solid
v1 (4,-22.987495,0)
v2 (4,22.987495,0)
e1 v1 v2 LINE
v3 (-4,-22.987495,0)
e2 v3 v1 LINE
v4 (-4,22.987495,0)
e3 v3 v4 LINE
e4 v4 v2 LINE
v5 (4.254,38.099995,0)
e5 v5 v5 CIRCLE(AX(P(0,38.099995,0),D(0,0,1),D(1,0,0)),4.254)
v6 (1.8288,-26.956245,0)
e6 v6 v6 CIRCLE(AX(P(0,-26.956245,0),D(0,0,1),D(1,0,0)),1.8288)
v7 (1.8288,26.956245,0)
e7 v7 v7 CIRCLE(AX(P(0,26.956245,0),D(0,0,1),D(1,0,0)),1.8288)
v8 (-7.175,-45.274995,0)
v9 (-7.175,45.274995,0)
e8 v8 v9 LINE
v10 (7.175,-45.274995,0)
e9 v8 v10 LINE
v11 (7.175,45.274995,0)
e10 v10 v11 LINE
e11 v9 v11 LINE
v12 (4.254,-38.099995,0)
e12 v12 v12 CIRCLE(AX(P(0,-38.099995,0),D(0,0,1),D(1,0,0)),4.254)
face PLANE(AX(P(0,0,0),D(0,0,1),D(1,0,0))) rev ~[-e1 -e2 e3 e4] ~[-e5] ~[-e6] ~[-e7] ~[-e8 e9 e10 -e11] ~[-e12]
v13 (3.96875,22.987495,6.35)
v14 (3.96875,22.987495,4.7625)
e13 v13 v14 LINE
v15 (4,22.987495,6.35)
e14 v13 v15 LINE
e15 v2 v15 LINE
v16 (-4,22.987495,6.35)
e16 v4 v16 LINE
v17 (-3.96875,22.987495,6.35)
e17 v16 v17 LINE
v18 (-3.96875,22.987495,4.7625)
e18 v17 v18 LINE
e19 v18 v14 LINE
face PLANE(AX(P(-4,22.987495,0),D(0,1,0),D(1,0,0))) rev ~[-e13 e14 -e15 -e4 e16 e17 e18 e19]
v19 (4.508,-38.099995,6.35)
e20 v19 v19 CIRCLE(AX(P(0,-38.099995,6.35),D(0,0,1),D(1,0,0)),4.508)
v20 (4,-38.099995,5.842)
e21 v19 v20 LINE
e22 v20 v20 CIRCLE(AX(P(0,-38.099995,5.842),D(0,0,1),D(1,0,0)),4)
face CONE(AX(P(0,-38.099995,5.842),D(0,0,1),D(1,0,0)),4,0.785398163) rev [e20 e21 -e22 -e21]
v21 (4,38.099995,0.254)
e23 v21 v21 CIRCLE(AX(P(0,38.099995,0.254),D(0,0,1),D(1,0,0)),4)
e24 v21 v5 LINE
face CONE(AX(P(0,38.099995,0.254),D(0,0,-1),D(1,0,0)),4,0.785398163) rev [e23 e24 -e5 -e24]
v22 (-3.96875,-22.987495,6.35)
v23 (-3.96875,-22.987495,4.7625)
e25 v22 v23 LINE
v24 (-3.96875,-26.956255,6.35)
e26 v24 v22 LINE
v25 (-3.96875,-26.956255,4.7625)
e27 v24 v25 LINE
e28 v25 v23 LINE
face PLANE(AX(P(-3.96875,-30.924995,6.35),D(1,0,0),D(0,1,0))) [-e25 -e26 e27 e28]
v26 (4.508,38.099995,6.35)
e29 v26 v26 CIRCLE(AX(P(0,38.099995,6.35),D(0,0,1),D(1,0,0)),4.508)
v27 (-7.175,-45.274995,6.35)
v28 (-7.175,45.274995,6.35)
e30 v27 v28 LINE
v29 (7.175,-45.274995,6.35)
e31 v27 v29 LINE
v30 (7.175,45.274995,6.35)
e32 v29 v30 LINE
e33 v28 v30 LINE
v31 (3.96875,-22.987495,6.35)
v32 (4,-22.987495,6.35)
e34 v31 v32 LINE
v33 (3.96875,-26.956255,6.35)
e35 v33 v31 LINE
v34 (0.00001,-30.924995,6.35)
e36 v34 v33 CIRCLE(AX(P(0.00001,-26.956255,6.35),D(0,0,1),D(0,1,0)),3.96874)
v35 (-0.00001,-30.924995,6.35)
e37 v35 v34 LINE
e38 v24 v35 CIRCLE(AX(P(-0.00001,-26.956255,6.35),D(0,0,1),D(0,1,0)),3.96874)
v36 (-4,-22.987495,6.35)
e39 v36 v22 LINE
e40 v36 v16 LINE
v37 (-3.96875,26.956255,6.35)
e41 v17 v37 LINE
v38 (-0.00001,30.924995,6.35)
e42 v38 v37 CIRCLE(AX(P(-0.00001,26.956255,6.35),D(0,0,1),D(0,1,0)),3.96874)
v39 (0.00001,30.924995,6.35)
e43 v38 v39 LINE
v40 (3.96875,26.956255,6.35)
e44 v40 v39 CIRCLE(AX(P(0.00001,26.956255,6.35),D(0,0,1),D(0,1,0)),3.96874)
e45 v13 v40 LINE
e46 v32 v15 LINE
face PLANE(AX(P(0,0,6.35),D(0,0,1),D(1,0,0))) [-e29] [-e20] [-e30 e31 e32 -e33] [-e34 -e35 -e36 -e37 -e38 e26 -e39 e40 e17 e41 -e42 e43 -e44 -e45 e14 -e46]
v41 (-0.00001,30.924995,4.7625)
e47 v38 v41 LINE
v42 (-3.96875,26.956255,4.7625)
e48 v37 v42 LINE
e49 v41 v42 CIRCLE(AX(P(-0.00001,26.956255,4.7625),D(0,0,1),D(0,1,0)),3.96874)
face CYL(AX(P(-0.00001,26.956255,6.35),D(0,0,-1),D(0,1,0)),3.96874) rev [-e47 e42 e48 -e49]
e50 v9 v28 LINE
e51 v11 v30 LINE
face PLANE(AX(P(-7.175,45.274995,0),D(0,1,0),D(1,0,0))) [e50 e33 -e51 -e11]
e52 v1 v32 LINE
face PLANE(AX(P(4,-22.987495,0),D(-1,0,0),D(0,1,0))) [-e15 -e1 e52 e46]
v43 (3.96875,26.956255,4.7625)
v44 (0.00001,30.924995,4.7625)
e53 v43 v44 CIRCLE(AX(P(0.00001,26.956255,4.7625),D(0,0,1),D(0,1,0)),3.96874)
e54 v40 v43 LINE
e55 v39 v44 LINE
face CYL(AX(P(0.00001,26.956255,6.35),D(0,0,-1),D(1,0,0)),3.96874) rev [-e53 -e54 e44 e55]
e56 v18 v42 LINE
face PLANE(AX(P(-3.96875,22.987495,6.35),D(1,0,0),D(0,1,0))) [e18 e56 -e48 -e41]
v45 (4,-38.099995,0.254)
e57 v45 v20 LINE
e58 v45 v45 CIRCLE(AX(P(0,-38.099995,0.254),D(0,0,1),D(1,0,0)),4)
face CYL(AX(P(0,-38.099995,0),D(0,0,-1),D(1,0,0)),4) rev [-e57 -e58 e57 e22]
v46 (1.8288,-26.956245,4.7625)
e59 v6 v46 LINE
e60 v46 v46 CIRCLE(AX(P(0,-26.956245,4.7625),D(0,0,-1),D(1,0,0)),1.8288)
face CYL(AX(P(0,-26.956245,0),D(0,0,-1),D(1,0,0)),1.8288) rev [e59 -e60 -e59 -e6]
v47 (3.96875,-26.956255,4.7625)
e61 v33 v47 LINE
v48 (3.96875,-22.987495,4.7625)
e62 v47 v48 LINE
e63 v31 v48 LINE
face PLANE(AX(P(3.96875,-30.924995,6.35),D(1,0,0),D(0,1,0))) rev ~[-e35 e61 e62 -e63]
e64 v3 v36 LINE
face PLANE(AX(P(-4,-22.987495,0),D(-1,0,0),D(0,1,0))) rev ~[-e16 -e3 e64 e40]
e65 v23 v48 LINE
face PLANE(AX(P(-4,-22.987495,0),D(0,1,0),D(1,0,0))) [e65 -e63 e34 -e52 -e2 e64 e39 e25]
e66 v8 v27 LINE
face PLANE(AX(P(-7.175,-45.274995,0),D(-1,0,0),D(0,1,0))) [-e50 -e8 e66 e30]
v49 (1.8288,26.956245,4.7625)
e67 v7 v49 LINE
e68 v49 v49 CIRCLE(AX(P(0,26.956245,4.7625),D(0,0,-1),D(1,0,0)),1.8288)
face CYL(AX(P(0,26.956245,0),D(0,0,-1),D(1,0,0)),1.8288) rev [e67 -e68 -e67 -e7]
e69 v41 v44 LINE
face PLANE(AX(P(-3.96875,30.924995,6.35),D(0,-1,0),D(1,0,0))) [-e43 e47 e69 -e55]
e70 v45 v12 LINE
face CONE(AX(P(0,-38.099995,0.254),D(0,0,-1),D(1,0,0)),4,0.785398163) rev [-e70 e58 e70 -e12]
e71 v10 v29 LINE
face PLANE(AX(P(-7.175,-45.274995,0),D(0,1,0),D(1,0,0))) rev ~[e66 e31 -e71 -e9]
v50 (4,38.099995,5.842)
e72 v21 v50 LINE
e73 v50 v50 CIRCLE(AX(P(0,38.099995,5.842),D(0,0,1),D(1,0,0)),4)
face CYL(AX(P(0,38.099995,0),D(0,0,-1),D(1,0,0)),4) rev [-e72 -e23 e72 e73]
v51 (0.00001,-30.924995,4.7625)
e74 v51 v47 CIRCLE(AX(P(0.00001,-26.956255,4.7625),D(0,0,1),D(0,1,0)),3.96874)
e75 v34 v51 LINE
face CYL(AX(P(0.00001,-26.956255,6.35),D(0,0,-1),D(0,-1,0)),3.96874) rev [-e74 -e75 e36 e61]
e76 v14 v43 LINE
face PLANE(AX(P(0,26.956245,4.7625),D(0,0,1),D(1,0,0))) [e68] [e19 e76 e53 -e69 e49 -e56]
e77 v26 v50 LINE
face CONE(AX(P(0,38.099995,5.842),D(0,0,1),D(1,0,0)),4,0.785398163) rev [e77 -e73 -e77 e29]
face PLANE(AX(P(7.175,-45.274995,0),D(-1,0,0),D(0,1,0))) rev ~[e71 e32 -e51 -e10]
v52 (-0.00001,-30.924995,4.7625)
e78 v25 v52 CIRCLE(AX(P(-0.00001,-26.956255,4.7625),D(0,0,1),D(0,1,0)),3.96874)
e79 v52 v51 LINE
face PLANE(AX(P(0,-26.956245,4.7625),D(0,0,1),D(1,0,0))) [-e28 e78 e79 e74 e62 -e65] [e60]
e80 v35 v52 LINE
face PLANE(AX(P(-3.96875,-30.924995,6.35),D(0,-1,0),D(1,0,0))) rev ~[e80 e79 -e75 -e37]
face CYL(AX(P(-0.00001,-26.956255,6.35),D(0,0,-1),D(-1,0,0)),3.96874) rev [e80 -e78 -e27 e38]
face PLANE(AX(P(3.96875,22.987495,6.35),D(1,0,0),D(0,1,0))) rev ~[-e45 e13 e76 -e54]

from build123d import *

# Parameters (mm, degrees)
F0_W     = 14.35
F0_H     = 90.5499906
F0_R     = 4
F0_R_2   = 1.8288
F0_W_2   = 8
F0_H_2   = 45.9749906
F1_DEPTH = 6.35
F2_SIZE  = 0.254
F3_W     = 7.9375
F3_H     = 7.9375
F4_DEPTH = 1.5875
F5_R     = 3.96874
F6_SIZE  = 0.508


# Not quite as in the source:
# - a fillet or chamfer is up to 0.001 mm smaller than in the source, because OpenCascade refuses the exact size


with BuildPart() as f1:
    # F0 (on Top) → F1 (new body)
    with BuildSketch(Plane.XY):
        Rectangle(F0_W, F0_H)
        with Locations((0, -38.0999953)):
            Circle(F0_R, mode=Mode.SUBTRACT)
        with Locations((0, -26.9562453)):
            Circle(F0_R_2, mode=Mode.SUBTRACT)
        Rectangle(F0_W_2, F0_H_2, mode=Mode.SUBTRACT)
        with Locations((0, 26.9562453)):
            Circle(F0_R_2, mode=Mode.SUBTRACT)
        with Locations((0, 38.0999953)):
            Circle(F0_R, mode=Mode.SUBTRACT)
    extrude(amount=F1_DEPTH)

    # F2
    f2_edges = [f1.edges().sort_by_distance(p)[0] for p in [
        (-4, 38.099995, 0),
        (-4, -38.099995, 0),
    ]]
    chamfer(f2_edges, length=F2_SIZE)

    # F3 (on face) → F4 (cut)
    with BuildSketch(Plane.XY.offset(6.35)):
        with Locations((0, 26.9562453)):
            Rectangle(F3_W, F3_H)
        with Locations((0, -26.9562453)):
            Rectangle(F3_W, F3_H)
    extrude(amount=-F4_DEPTH, mode=Mode.SUBTRACT)

    # F5 (radius 3.96875 in the source; OpenCascade refuses exactly that, so slightly less here)
    f5_edges = [f1.edges().sort_by_distance(p)[0] for p in [
        (-3.96875, -30.924995, 5.55625),
        (3.96875, -30.924995, 5.55625),
        (-3.96875, 30.924995, 5.55625),
        (3.96875, 30.924995, 5.55625),
    ]]
    fillet(f5_edges, radius=F5_R)

    # F6
    f6_edges = [f1.edges().sort_by_distance(p)[0] for p in [
        (-4, 38.099995, 6.35),
        (-4, -38.099995, 6.35),
    ]]
    chamfer(f6_edges, length=F6_SIZE)


solid = f1.part
